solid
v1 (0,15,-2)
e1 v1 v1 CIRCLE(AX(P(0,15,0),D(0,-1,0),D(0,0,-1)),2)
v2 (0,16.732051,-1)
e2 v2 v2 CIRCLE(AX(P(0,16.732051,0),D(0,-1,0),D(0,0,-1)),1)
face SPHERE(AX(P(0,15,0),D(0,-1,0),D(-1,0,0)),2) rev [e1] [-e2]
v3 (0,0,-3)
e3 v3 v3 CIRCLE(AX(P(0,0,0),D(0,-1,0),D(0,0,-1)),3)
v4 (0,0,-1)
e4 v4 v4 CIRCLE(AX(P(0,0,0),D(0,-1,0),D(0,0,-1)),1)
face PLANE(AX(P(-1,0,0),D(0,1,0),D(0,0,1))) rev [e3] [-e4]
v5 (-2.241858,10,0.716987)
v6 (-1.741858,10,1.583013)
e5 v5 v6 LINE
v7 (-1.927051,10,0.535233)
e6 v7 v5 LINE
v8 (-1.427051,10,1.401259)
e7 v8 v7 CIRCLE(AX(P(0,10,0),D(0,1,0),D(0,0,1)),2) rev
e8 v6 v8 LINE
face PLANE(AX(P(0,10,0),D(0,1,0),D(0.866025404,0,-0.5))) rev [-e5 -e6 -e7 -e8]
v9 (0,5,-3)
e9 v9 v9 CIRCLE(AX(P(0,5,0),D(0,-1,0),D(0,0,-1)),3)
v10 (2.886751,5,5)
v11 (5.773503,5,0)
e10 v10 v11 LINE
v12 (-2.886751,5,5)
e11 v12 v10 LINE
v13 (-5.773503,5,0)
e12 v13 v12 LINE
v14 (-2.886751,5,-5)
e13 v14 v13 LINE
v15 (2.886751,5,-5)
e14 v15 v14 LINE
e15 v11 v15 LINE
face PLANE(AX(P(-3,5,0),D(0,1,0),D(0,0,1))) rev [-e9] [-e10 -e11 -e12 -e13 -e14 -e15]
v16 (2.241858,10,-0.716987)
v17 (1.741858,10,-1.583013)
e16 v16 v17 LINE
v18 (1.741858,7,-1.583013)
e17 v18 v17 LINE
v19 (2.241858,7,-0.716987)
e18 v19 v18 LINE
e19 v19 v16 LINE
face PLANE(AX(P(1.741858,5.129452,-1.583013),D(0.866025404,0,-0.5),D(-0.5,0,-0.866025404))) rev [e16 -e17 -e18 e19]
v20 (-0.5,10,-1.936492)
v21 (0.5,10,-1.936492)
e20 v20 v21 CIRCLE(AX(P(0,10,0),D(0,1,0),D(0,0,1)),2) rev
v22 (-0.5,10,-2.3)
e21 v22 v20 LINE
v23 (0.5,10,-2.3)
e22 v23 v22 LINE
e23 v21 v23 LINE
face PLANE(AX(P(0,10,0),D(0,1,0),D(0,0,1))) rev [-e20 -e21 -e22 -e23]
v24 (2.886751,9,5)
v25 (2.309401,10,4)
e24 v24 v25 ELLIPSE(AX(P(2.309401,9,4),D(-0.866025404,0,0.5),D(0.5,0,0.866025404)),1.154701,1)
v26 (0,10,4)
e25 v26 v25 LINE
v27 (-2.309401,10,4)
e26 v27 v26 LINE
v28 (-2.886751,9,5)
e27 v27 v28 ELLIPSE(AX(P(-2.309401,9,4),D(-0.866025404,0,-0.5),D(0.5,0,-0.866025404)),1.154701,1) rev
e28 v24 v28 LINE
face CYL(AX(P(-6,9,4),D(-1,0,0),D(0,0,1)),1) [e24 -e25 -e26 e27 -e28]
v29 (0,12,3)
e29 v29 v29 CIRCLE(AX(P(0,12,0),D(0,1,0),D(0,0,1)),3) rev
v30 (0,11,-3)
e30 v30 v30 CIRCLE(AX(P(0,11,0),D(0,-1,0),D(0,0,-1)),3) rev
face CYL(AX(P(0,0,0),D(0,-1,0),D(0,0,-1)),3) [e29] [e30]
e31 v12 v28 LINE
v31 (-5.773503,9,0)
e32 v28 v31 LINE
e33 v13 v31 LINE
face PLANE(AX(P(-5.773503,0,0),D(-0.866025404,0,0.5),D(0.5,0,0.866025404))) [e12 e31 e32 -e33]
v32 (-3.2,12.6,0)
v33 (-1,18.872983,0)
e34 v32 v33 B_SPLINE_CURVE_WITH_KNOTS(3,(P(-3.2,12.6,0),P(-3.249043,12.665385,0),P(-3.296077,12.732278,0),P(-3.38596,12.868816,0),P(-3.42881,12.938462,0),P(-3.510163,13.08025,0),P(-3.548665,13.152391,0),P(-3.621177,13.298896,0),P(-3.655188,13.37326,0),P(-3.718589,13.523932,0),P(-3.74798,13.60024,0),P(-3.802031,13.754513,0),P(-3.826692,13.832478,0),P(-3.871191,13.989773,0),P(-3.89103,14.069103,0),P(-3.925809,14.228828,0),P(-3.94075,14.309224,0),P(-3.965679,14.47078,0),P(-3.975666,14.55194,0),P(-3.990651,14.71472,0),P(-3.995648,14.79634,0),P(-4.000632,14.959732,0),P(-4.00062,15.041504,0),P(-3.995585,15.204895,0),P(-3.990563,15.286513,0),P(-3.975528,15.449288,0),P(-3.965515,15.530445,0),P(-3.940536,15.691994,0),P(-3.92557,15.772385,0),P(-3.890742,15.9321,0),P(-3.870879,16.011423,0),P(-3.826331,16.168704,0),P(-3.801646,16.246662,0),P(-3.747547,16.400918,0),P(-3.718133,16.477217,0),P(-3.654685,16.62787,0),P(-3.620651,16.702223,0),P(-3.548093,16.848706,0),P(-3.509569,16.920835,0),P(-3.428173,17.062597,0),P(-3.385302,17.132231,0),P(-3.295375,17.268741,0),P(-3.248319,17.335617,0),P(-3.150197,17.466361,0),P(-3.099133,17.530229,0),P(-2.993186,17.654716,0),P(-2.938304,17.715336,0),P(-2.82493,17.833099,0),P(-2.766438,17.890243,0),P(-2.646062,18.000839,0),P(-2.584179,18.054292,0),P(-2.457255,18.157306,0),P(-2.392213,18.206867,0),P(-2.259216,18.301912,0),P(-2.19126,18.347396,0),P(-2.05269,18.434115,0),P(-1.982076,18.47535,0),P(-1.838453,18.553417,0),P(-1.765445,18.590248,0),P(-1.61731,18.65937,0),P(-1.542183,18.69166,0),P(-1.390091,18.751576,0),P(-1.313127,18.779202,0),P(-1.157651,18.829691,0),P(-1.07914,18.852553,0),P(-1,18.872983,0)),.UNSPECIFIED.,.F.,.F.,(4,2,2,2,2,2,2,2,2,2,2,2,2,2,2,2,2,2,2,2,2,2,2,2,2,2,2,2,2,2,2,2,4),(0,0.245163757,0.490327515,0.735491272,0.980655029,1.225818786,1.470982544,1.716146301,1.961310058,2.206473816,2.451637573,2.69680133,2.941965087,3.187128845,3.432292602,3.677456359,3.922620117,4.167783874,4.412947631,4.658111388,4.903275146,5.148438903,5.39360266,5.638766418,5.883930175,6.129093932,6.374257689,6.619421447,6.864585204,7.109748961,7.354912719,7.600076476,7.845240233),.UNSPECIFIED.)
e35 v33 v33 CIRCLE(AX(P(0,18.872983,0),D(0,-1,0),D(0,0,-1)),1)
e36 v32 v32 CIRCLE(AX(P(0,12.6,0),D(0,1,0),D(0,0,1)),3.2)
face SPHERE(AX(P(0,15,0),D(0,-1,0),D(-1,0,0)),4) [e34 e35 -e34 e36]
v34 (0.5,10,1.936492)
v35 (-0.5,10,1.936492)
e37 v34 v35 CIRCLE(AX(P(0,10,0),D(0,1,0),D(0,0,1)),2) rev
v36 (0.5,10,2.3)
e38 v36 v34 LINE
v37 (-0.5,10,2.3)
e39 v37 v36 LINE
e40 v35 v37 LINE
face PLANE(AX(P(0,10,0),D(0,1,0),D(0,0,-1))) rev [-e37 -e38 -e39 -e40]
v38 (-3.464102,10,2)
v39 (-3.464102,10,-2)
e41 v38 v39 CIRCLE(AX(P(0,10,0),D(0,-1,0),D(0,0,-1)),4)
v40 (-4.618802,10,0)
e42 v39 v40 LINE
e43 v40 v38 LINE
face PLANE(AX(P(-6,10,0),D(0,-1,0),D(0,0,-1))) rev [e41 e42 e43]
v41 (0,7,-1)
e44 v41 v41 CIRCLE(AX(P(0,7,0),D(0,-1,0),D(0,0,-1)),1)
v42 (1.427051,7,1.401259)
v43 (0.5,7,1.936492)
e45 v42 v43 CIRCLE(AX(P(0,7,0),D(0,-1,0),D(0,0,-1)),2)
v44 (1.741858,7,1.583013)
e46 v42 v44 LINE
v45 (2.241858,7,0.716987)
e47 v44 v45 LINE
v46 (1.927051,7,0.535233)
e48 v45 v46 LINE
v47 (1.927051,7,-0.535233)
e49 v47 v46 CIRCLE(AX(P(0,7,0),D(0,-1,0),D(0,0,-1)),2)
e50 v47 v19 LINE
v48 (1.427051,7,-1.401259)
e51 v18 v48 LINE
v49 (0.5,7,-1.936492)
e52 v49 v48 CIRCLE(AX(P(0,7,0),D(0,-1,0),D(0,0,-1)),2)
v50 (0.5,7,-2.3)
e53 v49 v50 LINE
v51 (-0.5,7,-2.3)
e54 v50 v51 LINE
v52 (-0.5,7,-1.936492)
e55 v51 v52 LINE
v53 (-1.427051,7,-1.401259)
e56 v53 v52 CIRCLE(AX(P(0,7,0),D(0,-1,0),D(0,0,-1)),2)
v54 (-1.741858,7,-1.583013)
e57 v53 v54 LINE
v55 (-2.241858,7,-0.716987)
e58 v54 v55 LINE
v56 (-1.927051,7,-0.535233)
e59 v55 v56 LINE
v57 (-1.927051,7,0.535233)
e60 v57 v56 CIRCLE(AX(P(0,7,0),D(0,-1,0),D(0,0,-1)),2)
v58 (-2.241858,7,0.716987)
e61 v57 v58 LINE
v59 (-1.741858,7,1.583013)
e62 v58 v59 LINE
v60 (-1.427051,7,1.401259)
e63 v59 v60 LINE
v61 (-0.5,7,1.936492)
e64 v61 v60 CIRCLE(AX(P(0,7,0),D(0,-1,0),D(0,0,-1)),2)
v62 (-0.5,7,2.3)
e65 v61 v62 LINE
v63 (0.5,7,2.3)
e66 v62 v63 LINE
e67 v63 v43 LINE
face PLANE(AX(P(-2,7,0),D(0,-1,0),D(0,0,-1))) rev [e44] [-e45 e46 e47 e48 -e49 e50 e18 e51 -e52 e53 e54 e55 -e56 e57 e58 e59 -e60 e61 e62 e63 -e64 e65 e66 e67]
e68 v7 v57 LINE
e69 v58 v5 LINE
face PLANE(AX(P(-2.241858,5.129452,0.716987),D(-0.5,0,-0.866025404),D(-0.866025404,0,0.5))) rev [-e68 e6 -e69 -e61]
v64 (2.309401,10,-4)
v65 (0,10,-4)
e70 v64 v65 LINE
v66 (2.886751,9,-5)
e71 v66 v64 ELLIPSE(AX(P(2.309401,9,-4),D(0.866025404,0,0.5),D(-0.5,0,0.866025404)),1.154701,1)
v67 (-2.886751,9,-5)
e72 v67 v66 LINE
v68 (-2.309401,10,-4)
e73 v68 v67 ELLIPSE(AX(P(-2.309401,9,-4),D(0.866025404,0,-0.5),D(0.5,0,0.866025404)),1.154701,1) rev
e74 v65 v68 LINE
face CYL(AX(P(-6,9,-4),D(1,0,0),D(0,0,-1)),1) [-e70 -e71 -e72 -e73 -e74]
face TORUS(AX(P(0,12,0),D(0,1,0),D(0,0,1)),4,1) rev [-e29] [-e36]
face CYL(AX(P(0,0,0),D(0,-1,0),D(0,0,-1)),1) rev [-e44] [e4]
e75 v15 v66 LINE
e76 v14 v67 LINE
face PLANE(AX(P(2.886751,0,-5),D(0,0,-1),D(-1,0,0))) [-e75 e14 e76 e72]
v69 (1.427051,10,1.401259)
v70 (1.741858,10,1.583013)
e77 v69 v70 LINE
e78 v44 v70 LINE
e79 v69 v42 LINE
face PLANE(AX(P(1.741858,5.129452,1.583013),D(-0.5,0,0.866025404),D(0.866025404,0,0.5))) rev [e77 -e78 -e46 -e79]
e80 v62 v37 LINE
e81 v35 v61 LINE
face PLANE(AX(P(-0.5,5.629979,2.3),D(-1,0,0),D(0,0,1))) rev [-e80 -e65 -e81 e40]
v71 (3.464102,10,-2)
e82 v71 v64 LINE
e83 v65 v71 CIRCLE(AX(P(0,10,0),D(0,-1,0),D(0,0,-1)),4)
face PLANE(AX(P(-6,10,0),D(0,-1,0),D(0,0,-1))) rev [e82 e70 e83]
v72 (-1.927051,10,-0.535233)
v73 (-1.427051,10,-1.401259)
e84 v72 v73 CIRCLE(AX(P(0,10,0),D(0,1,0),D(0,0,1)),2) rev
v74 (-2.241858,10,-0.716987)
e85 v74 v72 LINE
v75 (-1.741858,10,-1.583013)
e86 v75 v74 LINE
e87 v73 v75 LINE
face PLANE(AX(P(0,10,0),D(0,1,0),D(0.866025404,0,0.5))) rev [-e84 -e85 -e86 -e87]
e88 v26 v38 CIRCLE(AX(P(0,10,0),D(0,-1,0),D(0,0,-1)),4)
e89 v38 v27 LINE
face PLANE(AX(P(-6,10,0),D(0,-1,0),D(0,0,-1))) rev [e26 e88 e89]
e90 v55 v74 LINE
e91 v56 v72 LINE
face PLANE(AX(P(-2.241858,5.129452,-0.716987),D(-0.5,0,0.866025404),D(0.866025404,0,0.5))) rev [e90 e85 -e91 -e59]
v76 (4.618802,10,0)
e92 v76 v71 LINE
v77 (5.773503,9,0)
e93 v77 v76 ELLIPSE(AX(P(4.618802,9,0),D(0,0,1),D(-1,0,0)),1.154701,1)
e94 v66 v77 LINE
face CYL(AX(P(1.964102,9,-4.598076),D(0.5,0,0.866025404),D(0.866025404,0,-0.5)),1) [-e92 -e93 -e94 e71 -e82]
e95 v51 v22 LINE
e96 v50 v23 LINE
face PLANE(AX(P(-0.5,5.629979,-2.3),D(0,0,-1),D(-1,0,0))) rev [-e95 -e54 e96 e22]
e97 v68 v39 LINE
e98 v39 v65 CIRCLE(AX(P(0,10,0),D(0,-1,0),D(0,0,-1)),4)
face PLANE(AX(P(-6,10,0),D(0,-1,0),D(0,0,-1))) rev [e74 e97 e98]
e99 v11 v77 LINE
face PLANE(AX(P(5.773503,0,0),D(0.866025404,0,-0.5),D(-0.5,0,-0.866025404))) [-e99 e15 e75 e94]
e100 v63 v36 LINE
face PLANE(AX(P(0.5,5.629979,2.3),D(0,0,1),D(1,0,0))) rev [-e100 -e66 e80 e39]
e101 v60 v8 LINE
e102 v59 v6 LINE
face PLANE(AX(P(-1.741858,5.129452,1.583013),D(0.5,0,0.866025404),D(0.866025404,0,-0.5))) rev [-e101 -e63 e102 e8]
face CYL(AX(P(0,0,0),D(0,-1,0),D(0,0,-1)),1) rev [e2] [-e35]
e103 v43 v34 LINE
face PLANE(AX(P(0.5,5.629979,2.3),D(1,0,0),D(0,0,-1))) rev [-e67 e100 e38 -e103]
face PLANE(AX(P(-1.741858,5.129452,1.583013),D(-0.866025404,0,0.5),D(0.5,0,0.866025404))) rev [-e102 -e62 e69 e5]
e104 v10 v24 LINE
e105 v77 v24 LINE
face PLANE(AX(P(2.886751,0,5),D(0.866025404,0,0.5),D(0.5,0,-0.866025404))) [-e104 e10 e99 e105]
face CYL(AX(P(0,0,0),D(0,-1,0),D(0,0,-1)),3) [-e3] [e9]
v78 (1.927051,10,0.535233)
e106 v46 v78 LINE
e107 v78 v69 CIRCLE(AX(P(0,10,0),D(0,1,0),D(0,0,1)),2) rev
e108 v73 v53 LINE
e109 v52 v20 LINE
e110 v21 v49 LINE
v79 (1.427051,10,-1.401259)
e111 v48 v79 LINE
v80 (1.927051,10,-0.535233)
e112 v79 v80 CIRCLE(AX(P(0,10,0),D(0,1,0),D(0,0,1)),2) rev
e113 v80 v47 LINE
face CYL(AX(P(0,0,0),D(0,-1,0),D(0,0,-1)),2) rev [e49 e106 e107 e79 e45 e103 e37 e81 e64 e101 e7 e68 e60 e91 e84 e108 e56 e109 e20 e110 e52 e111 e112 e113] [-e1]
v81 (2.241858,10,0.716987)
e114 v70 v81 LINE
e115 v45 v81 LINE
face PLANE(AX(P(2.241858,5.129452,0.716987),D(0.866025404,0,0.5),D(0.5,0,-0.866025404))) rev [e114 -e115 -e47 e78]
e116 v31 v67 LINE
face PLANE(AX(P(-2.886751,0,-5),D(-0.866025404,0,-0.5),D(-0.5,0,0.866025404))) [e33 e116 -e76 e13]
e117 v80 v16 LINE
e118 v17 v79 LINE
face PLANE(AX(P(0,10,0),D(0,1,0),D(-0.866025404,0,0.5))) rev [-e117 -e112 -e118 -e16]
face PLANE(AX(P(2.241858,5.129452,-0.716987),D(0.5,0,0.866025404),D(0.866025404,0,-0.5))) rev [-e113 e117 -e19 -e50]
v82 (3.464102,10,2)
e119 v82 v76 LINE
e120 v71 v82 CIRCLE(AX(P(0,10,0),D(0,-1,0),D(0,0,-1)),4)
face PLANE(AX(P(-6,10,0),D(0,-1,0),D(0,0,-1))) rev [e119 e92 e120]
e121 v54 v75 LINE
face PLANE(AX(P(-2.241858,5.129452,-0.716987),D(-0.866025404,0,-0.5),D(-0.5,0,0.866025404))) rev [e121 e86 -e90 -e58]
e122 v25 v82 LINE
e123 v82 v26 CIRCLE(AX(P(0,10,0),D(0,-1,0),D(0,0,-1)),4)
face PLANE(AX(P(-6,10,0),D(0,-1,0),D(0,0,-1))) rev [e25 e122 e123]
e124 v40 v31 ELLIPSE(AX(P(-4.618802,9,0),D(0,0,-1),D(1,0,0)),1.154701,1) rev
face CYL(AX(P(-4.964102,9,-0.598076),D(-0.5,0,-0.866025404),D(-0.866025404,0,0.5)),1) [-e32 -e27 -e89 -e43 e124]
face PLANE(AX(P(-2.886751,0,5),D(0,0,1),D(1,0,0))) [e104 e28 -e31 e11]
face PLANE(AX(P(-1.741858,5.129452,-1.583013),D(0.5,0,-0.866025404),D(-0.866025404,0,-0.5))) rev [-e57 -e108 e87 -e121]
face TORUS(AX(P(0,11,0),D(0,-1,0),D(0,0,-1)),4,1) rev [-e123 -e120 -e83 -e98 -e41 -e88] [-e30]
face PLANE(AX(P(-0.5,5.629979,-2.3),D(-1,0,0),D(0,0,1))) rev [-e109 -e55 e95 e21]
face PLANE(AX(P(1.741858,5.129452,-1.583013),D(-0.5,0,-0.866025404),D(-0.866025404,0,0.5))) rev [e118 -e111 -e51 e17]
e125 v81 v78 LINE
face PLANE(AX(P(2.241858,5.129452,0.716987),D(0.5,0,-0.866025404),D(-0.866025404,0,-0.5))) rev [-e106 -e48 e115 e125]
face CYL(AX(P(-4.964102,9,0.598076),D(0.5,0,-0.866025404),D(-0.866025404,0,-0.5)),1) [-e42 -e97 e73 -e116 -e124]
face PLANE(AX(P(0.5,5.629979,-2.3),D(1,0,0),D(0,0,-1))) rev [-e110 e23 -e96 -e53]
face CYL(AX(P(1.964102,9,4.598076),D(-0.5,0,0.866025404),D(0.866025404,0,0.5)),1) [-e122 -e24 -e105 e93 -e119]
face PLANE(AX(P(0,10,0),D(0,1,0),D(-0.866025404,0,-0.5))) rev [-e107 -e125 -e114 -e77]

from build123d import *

# Parameters (mm, degrees)
SKETCH2_R          = 10.06808877
CUT_EXTRUDE1_DEPTH = 10
FILLET1_R          = 1
FILLET2_R          = 1
SKETCH3_W          = 1
SKETCH3_H          = 0.936459383
CUT_EXTRUDE2_DEPTH = 3
CIRPATTERN1_COUNT  = 6


with BuildPart() as part:
    # Sketch1 → Revolve1 (revolve)
    with BuildSketch(Plane.XY, mode=Mode.PRIVATE) as revolve1_sk:
        with BuildLine():
            Line((-1, 0), (-3, 0))
            Line((-3, 0), (-3, 5))
            Line((-3, 5), (-6, 5))
            Line((-6, 5), (-6, 10))
            Line((-6, 10), (-3, 10))
            Line((-3, 10), (-3, 12.354248689))
            ThreePointArc((-3, 12.354248689), (-3.824065295, 16.173253859), (-1, 18.872983346))
            Line((-1, 18.872983346), (-1, 16.732050808))
            ThreePointArc((-1, 16.732050808), (-1.732050808, 16), (-2, 15))
            Line((-2, 15), (-2, 7))
            Line((-2, 7), (-1, 7))
            Line((-1, 7), (-1, 0))
        make_face()
    revolve(revolve1_sk.sketch.rotate(Axis((0, 0, 0), (0, 1, 0)), 270), axis=Axis((0, 0, 0), (0, 1, 0)))

    # Sketch2 → Cut-Extrude1 (cut)
    with BuildSketch(Plane(origin=(0, 10, 0), x_dir=(1, 0, 0), z_dir=(0, 1, 0))):
        Circle(SKETCH2_R)
        Polygon((5.773502692, 0), (2.886751346, 5), (-2.886751346, 5), (-5.773502692, 0), (-2.886751346, -5), (2.886751346, -5), align=None, mode=Mode.SUBTRACT)
    extrude(amount=-CUT_EXTRUDE1_DEPTH, mode=Mode.SUBTRACT)

    # Fillet1
    fillet1_edges = [part.edges().sort_by_distance(p)[0] for p in [
        (0, 12.354248689, 3),
        (0, 10, 3),
    ]]
    fillet(fillet1_edges, radius=FILLET1_R)

    # Fillet2
    fillet2_edges = [part.edges().sort_by_distance(p)[0] for p in [
        (4.330127019, 10, 2.5),
        (0, 10, 5),
        (-4.330127019, 10, 2.5),
        (-4.330127019, 10, -2.5),
        (0, 10, -5),
        (4.330127019, 10, -2.5),
    ]]
    fillet(fillet2_edges, radius=FILLET2_R - 0.0001)  # a hair under: the kernel refuses the full size

    # Sketch3 → Cut-Extrude2 (cut)
    with BuildSketch(Plane(origin=(0, 10, 0), x_dir=(1, 0, 0), z_dir=(0, 1, 0))):
        with Locations((0, 1.831770309)):
            Rectangle(SKETCH3_W, SKETCH3_H)
    cut_extrude2 = extrude(amount=-CUT_EXTRUDE2_DEPTH, mode=Mode.SUBTRACT)

    # CirPattern1: Cut-Extrude2 ×6 about axis
    cirpattern1_axis = Axis((0, 0, 0), (0, 1, 0))
    for i in range(1, CIRPATTERN1_COUNT):
        add(cut_extrude2.rotate(cirpattern1_axis, i * 360 / CIRPATTERN1_COUNT), mode=Mode.SUBTRACT)


solid = part.part
